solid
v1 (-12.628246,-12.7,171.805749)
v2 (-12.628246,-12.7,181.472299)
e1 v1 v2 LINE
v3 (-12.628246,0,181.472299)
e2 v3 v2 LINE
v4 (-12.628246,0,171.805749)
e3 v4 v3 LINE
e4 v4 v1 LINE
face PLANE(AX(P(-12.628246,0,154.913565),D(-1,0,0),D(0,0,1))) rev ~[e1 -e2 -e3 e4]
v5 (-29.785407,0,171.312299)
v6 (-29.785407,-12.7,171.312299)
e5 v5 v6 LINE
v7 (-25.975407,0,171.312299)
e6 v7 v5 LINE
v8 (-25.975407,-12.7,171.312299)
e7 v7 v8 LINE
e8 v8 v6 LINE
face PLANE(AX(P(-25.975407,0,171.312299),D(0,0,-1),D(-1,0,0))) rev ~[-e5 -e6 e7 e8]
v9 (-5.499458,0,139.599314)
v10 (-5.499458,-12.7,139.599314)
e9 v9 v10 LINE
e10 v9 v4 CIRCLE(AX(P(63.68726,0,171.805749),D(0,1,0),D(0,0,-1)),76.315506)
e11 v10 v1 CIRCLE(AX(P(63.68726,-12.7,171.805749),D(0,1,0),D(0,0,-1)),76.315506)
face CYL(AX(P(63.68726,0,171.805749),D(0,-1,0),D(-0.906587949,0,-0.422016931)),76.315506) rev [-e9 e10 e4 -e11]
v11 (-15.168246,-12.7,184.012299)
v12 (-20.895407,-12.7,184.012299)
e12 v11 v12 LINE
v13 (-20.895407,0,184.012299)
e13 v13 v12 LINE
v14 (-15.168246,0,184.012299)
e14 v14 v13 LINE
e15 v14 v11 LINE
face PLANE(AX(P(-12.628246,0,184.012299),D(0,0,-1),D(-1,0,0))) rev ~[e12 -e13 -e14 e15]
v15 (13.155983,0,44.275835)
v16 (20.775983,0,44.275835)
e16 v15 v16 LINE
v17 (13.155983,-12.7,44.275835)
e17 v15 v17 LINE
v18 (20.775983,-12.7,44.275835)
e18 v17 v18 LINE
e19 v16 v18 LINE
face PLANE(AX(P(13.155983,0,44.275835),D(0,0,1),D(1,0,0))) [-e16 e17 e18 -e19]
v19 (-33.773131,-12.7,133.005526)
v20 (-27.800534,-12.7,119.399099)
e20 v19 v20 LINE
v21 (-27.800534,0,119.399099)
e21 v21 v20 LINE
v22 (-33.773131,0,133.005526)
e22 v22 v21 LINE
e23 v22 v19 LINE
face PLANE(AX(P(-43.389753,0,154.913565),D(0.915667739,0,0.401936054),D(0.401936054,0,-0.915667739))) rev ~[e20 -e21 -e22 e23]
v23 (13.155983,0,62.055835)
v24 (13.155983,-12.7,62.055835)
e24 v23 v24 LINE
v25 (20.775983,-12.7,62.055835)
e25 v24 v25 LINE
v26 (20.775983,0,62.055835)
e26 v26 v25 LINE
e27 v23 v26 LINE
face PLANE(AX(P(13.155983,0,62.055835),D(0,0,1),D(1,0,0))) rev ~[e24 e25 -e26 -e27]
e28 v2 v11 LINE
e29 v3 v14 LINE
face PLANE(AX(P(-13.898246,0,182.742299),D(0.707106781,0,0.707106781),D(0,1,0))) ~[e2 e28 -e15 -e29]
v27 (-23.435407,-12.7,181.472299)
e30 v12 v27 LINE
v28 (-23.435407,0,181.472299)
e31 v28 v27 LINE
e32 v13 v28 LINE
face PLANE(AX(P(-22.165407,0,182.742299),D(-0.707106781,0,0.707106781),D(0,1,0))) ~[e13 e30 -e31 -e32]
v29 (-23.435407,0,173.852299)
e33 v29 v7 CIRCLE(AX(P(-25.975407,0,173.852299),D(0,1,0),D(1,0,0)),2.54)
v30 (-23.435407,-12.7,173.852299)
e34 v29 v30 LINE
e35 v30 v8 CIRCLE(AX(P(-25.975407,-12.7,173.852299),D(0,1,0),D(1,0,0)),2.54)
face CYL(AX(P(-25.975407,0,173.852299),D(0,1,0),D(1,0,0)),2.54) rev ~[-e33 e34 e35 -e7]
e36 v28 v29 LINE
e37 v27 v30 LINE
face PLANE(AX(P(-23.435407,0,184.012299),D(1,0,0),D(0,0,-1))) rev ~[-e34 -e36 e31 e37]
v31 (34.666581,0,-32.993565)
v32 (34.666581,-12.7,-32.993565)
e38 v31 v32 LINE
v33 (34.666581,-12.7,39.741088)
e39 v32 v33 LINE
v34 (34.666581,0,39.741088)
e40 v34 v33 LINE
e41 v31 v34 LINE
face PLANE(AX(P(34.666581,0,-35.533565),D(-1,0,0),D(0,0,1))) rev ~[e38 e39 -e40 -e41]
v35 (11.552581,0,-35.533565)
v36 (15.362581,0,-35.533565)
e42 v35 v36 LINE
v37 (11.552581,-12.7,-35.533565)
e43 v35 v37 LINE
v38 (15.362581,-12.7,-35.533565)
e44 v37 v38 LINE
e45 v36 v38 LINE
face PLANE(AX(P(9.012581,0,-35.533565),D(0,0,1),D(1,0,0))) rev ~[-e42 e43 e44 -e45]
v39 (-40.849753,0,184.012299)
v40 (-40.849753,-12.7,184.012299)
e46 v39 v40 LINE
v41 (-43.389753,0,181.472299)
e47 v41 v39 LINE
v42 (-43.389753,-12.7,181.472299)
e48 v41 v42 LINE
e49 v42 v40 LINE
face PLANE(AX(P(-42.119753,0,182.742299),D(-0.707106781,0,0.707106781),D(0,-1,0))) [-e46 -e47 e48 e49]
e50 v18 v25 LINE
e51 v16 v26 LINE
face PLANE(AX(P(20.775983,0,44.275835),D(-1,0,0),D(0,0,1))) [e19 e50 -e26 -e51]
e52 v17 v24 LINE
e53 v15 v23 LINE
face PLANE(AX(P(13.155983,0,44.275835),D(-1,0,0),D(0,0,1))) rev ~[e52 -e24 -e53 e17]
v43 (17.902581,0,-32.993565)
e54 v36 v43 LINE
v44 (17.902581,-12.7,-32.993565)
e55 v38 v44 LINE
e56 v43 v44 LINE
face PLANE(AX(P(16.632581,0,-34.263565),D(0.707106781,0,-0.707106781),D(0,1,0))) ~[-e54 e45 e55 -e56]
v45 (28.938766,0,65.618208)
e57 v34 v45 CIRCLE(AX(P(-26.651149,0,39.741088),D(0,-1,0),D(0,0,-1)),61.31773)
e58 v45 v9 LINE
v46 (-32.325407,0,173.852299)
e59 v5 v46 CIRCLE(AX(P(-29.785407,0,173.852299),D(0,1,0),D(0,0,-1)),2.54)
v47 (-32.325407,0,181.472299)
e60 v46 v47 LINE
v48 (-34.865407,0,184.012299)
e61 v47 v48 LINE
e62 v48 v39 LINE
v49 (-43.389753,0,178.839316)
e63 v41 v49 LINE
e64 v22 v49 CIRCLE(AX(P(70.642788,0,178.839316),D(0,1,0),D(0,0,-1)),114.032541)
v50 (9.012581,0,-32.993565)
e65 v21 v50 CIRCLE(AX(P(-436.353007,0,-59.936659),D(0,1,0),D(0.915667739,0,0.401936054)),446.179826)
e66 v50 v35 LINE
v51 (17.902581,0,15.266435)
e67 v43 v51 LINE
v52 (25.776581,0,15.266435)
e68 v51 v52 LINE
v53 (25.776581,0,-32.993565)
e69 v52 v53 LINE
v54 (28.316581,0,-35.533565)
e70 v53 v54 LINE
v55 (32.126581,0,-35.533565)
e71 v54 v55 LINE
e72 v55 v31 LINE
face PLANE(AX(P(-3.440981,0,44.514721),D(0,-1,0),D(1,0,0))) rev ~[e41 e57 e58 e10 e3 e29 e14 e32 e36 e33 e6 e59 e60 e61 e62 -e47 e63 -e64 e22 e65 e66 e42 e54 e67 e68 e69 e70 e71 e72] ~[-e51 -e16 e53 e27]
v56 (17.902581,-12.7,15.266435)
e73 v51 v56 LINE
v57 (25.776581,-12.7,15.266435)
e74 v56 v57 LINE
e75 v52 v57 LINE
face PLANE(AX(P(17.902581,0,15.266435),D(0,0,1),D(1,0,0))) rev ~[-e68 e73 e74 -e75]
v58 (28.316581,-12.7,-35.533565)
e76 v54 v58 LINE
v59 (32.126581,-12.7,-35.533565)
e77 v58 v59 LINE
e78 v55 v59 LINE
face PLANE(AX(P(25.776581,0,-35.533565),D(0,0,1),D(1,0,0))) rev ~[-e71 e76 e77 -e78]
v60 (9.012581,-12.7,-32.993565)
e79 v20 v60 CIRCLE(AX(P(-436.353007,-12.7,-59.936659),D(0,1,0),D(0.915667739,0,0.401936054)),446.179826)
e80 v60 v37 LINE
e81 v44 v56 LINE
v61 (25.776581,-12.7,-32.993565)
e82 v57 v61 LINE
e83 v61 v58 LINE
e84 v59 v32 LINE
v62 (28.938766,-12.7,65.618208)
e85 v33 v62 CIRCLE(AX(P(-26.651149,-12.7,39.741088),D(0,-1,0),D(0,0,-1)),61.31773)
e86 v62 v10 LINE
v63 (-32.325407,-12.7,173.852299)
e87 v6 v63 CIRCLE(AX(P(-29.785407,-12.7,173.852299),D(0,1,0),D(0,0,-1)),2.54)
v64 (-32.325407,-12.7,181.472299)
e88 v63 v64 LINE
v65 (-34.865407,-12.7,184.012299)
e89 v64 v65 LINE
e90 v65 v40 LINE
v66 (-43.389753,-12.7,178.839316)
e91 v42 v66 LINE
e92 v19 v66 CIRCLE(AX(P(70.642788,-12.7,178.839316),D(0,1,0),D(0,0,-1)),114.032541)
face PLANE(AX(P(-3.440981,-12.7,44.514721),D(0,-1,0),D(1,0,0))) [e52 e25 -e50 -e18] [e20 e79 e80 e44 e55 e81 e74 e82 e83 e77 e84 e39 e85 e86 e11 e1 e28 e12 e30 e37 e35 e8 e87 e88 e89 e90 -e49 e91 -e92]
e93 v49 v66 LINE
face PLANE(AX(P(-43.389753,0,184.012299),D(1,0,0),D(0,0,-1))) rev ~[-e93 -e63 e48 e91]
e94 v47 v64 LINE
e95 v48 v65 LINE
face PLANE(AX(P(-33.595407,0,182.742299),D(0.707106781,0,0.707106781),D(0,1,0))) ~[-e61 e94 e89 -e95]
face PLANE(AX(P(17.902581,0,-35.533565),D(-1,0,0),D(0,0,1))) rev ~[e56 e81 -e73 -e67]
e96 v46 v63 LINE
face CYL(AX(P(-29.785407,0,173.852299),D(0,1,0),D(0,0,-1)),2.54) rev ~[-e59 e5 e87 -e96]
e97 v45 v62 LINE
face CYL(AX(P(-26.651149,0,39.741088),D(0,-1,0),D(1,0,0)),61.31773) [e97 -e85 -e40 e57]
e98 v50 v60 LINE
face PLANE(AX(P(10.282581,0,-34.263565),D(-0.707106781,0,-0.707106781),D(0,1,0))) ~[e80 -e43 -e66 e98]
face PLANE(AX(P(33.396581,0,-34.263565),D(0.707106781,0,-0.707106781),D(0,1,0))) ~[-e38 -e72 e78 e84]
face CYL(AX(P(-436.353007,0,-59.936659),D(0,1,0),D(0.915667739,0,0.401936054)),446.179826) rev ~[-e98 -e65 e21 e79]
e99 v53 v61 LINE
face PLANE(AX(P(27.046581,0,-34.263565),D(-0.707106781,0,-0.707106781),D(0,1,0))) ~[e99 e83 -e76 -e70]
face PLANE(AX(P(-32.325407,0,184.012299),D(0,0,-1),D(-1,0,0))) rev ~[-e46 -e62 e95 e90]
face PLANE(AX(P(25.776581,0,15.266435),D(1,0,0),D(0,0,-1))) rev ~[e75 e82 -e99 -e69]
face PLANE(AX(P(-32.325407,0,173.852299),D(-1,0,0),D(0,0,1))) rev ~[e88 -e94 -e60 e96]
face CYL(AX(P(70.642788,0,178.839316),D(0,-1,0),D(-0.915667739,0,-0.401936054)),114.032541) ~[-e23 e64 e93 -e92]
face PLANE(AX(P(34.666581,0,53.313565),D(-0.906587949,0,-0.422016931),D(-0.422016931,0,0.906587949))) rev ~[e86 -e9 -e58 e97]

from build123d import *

# Parameters (mm, degrees)
F0_W        = 7.62
F0_H        = 17.78
F1_DEPTH    = 12.7
F2_SIZE     = 2.54
F3_R        = 61.3177298103
F4_R        = 76.3155057079
F5_R        = 114.0325409017
F6_T1_DEPTH = 12.7


# Not quite as in the source:
# - a fillet or chamfer that OpenCascade refuses, or shapes differently, is made with other operations: its cross-section is extruded or revolved along the edge and cut away or added


with BuildPart() as f1:
    # F0 (on Front) → F1 (new body)
    with BuildSketch(Plane.XZ):
        with BuildLine():
            Line((-43.3897525072, 184.0122990829), (-43.3897525072, 154.9135648233))
            Line((-43.3897525072, 154.9135648233), (-12.6282460988, 154.9135648233))
            Line((-12.6282460988, 154.9135648233), (-12.6282460988, 184.0122990829))
            Line((-12.6282460988, 184.0122990829), (-23.4354074901, 184.0122990829))
            Line((-23.4354074901, 184.0122990829), (-23.4354074901, 173.8522990829))
            ThreePointArc((-23.4354074901, 173.8522990829), (-24.1793562659, 172.0562478587), (-25.9754074901, 171.3122990829))
            Line((-25.9754074901, 171.3122990829), (-29.7854074901, 171.3122990829))
            ThreePointArc((-29.7854074901, 171.3122990829), (-31.5814587143, 172.0562478587), (-32.3254074901, 173.8522990829))
            Line((-32.3254074901, 173.8522990829), (-32.3254074901, 184.0122990829))
            Line((-32.3254074901, 184.0122990829), (-43.3897525072, 184.0122990829))
        make_face()
        Polygon((-43.3897525072, 154.9135648233), (9.0125808752, 35.5335648233), (34.6665808752, 35.5335648233), (34.6665808752, 53.3135648233), (-12.6282460988, 154.9135648233), align=None)
        with Locations((16.9659831101, 53.1658351564)):
            Rectangle(F0_W, F0_H, mode=Mode.SUBTRACT)
        Polygon((34.6665808752, 35.5335648233), (9.0125808752, 35.5335648233), (9.0125808752, -35.5335648233), (17.9025808752, -35.5335648233), (17.9025808752, 15.2664351767), (25.7765808752, 15.2664351767), (25.7765808752, -35.5335648233), (34.6665808752, -35.5335648233), align=None)
    extrude(amount=F1_DEPTH)

    # F2
    f2_edges = [f1.edges().sort_by_distance(p)[0] for p in [
        (-32.325407, -6.35, 184.012299),
        (-23.435407, -6.35, 184.012299),
        (-12.628246, -6.35, 184.012299),
        (-43.389753, -6.35, 184.012299),
        (17.902581, -6.35, -35.533565),
        (25.776581, -6.35, -35.533565),
        (34.666581, -6.35, -35.533565),
        (9.012581, -6.35, -35.533565),
    ]]
    chamfer(f2_edges, length=F2_SIZE)

    # F3
    f3_edges = [f1.edges().sort_by_distance(p)[0] for p in [
        (34.666581, -6.35, 53.313565),
    ]]
    fillet(f3_edges, radius=F3_R)

    # F4
    f4_edges = [f1.edges().sort_by_distance(p)[0] for p in [
        (-12.628246, -6.35, 154.913565),
    ]]
    fillet(f4_edges, radius=F4_R)

    # F5
    f5_edges = [f1.edges().sort_by_distance(p)[0] for p in [
        (-43.389753, -6.35, 154.913565),
    ]]
    fillet(f5_edges, radius=F5_R)

    # F6: fillet of radius 446.1798259809 on 1 edges, made by hand

    # F6_s2 → F6_t1 (join)
    with BuildSketch(Plane.XZ):
        with BuildLine():
            ThreePointArc((-27.8005344067, 119.3990994032), (-2.6481597508, 44.8323374579), (9.0125808752, -32.9935648233))
            Line((9.0125808752, -32.9935648233), (9.0125808752, 35.5335648233))
            Line((9.0125808752, 35.5335648233), (-27.8005344067, 119.3990994032))
        make_face()
    extrude(amount=F6_T1_DEPTH)


solid = f1.part
